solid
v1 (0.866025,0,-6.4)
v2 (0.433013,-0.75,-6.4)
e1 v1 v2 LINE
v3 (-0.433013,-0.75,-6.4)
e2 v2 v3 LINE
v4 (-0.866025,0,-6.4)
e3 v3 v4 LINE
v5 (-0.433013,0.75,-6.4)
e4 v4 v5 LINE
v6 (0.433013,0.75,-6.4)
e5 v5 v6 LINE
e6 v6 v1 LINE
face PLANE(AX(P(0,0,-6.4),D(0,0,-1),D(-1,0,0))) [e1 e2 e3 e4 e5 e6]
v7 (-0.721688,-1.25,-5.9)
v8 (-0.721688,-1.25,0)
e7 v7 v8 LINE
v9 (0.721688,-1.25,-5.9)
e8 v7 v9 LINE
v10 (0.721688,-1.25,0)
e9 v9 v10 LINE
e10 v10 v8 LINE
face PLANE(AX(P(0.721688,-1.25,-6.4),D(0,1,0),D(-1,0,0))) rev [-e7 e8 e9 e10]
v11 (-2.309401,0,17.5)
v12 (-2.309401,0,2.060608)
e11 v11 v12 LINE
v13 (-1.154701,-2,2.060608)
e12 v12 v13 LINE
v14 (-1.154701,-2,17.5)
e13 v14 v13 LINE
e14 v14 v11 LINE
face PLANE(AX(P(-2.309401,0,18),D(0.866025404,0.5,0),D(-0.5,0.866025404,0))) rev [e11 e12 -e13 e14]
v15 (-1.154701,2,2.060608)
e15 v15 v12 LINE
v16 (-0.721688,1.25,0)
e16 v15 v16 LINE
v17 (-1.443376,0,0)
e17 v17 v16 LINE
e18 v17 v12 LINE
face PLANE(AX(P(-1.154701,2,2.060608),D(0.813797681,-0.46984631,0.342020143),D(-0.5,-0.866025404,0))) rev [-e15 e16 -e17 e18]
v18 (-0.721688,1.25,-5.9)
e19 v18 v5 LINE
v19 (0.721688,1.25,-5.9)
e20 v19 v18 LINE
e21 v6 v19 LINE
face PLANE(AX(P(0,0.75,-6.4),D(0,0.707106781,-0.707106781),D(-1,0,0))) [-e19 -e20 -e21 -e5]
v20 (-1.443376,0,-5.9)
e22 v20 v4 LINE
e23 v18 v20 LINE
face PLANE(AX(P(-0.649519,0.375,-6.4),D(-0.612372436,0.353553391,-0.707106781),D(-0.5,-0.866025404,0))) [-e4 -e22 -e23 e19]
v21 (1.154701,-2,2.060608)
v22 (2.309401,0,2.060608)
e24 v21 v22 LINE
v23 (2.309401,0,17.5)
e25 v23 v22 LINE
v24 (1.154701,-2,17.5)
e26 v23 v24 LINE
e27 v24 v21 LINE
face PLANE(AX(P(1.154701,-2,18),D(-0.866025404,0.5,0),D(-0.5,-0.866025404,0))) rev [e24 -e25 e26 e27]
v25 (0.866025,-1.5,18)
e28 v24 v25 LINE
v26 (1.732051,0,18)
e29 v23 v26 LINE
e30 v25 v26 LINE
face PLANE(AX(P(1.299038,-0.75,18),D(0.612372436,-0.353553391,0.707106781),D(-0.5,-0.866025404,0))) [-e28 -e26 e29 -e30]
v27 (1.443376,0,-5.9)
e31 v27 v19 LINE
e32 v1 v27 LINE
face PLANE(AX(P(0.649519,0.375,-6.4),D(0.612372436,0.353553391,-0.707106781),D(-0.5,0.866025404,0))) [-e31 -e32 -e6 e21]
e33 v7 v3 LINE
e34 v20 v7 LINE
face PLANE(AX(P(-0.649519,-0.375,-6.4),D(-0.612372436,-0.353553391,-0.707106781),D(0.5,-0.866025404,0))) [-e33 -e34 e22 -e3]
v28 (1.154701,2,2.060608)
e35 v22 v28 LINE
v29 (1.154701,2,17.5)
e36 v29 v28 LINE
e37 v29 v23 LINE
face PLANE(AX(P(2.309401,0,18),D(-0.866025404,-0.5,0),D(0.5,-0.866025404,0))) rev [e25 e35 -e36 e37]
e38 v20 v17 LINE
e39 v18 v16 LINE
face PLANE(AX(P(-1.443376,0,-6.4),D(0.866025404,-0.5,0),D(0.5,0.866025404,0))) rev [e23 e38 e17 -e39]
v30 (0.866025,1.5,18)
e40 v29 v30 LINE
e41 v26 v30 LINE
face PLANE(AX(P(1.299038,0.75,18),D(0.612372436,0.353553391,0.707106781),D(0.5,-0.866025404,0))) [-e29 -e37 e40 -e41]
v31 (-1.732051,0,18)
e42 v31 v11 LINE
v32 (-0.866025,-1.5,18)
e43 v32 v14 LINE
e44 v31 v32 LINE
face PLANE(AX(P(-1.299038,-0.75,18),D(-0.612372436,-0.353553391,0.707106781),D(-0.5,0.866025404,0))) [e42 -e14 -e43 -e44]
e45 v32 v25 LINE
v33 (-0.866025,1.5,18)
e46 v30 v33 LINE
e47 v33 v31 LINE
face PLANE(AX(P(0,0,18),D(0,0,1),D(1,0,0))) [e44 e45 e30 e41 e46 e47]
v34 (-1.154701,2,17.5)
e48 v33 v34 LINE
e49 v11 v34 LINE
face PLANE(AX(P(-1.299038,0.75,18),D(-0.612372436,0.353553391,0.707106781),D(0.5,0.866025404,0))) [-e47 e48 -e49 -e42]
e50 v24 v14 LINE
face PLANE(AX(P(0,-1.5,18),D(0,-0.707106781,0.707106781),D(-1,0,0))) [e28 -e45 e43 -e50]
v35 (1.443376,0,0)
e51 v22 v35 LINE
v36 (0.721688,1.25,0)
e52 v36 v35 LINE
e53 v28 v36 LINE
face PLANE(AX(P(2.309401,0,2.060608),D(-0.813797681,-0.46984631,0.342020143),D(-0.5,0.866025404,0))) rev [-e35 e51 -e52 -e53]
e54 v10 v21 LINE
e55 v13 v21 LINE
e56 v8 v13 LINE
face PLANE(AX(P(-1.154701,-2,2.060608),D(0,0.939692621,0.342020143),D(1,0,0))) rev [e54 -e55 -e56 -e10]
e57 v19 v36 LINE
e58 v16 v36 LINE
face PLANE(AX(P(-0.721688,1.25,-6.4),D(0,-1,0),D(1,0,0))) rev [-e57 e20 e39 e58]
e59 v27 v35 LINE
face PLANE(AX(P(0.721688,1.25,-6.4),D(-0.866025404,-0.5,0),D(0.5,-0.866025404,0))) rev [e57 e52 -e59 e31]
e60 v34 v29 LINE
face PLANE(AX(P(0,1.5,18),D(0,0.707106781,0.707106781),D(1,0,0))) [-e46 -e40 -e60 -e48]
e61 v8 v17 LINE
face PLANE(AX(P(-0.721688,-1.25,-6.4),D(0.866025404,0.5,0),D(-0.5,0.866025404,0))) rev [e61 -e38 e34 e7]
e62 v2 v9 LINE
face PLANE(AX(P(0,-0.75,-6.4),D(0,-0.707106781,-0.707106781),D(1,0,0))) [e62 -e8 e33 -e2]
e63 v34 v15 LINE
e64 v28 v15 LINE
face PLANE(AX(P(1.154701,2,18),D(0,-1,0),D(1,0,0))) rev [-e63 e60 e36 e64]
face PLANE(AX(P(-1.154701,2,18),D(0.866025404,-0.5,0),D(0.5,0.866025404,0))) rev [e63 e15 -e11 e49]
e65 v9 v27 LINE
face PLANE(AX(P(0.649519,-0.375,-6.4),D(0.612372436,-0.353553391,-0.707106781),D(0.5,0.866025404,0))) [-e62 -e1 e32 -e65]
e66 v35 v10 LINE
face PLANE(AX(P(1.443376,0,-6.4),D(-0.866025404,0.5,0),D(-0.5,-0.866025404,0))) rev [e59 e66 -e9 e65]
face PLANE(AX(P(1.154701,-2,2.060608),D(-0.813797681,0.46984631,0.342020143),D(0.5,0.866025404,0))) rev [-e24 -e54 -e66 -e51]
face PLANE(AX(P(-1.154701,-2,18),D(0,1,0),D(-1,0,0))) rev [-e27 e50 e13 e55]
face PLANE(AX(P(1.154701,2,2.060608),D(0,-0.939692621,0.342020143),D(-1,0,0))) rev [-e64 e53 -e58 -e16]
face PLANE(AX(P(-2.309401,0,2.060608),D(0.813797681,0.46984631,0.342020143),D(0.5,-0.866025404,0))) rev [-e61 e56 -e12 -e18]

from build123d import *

# Parameters (mm, degrees)
EXTRUDE_1_DEPTH  = 18
CHAMFER_1_SIZE   = 0.5
EXTRUDE_2_DEPTH  = 6.4
CHAMFER_3_SIZE   = 0.75
CHAMFER_3_SIZE_2 = 2.060608065
CHAMFER_4_SIZE   = 0.5


with BuildPart() as part:
    # 草图1 → 凸台-拉伸1 (new body)
    with BuildSketch(Plane.XY):
        Polygon((2.309401077, 0), (1.154700538, 2), (-1.154700538, 2), (-2.309401077, 0), (-1.154700538, -2), (1.154700538, -2), align=None)
    extrude(amount=EXTRUDE_1_DEPTH)

    # 倒角1
    chamfer_1_edges = [part.edges().sort_by_distance(p)[0] for p in [
        (0, 2, 18),
        (-1.732050808, 1, 18),
        (-1.732050808, -1, 18),
        (0, -2, 18),
        (1.732050808, -1, 18),
        (1.732050808, 1, 18),
    ]]
    chamfer(chamfer_1_edges, length=CHAMFER_1_SIZE)

    # 草图2 → 凸台-拉伸2 (add)
    with BuildSketch(Plane(origin=(0, 0, 0), x_dir=(-1, 0, 0), z_dir=(0, 0, -1))):
        Polygon((1.443375673, 0), (0.721687836, 1.25), (-0.721687836, 1.25), (-1.443375673, 0), (-0.721687836, -1.25), (0.721687836, -1.25), align=None)
    extrude(amount=EXTRUDE_2_DEPTH)

    # 倒角3
    # the kernel refuses this chamfer: 2.060608065, 0.75 mm, written as the material it takes off along each edge
    with BuildSketch(Plane(origin=(-6.500319125, -2, 0), x_dir=(-1.0524294974817634e-14, 0.9950833631817486, -0.09904090225205059), z_dir=(1, 0, 0))) as chamfer_3_piece_1_section:
        Polygon((CHAMFER_3_SIZE * 0.995083363182, CHAMFER_3_SIZE * 0.0990409022521), (-CHAMFER_3_SIZE_2 * 0.0990409022324, CHAMFER_3_SIZE_2 * 0.995083362984), (0, 0), align=None)
    chamfer_3_piece_1 = extrude(amount=13.000638251, mode=Mode.PRIVATE)
    chamfer_3_piece_1 = split(chamfer_3_piece_1, bisect_by=Plane(origin=(-1.179179606, -0.457601011, 0.71229118), z_dir=(-0.8660254037844392, -0.4999999999999994, 0)), keep=Keep.TOP, mode=Mode.PRIVATE)
    chamfer_3_piece_1 = split(chamfer_3_piece_1, bisect_by=Plane(origin=(-3.459667972, -1.25, 0.71229118), z_dir=(0, -1, 0)), keep=Keep.TOP, mode=Mode.PRIVATE)
    add(chamfer_3_piece_1, mode=Mode.SUBTRACT)
    with BuildSketch(Plane(origin=(-6.500319125, -2, 0), x_dir=(-1.0524294974817634e-14, 0.9950833631817486, -0.09904090225205059), z_dir=(1, 0, 0))) as chamfer_3_piece_2_section:
        Polygon((CHAMFER_3_SIZE * 0.995083363182, CHAMFER_3_SIZE * 0.0990409022521), (-CHAMFER_3_SIZE_2 * 0.0990409022324, CHAMFER_3_SIZE_2 * 0.995083362984), (0, 0), align=None)
    chamfer_3_piece_2 = extrude(amount=13.000638251, mode=Mode.PRIVATE)
    chamfer_3_piece_2 = split(chamfer_3_piece_2, bisect_by=Plane(origin=(-0.338481018, -1.91373368, 0.629088335), z_dir=(0.8660254037844392, 0.4999999999999994, 0)), keep=Keep.TOP, mode=Mode.PRIVATE)
    chamfer_3_piece_2 = split(chamfer_3_piece_2, bisect_by=Plane(origin=(0, -1.25, 0.629088335), z_dir=(0, -1, 0)), keep=Keep.TOP, mode=Mode.PRIVATE)
    chamfer_3_piece_2 = split(chamfer_3_piece_2, bisect_by=Plane(origin=(0.338481018, -1.91373368, 0.629088335), z_dir=(-0.8660254037844385, 0.5000000000000003, 0)), keep=Keep.TOP, mode=Mode.PRIVATE)
    add(chamfer_3_piece_2, mode=Mode.SUBTRACT)
    with BuildSketch(Plane(origin=(-6.500319125, -2, 0), x_dir=(-1.0524294974817634e-14, 0.9950833631817486, -0.09904090225205059), z_dir=(1, 0, 0))) as chamfer_3_piece_3_section:
        Polygon((CHAMFER_3_SIZE * 0.995083363182, CHAMFER_3_SIZE * 0.0990409022521), (-CHAMFER_3_SIZE_2 * 0.0990409022324, CHAMFER_3_SIZE_2 * 0.995083362984), (0, 0), align=None)
    chamfer_3_piece_3 = extrude(amount=13.000638251, mode=Mode.PRIVATE)
    chamfer_3_piece_3 = split(chamfer_3_piece_3, bisect_by=Plane(origin=(3.459667972, -1.25, 0.71229118), z_dir=(0, -1, 0)), keep=Keep.TOP, mode=Mode.PRIVATE)
    chamfer_3_piece_3 = split(chamfer_3_piece_3, bisect_by=Plane(origin=(1.179179606, -0.457601011, 0.71229118), z_dir=(0.8660254037844385, -0.5000000000000003, 0)), keep=Keep.TOP, mode=Mode.PRIVATE)
    add(chamfer_3_piece_3, mode=Mode.SUBTRACT)
    with BuildSketch(Plane(origin=(-4.98221037, 4.629441495, 0), x_dir=(0.8617674713986471, 0.49754168159088125, -0.09904090225205053), z_dir=(0.500000000000007, -0.8660254037844347, 0))) as chamfer_3_piece_4_section:
        Polygon((CHAMFER_3_SIZE * 0.995083363182, CHAMFER_3_SIZE * 0.0990409022521), (-CHAMFER_3_SIZE_2 * 0.0990409022324, CHAMFER_3_SIZE_2 * 0.995083362984), (0, 0), align=None)
    chamfer_3_piece_4 = extrude(amount=13.000638251, mode=Mode.PRIVATE)
    chamfer_3_piece_4 = split(chamfer_3_piece_4, bisect_by=Plane(origin=(-2.812365741, 2.371160352, 0.71229118), z_dir=(-0.8660254037844392, -0.4999999999999994, 0)), keep=Keep.TOP, mode=Mode.PRIVATE)
    chamfer_3_piece_4 = split(chamfer_3_piece_4, bisect_by=Plane(origin=(-0.985883903, 0.792398989, 0.71229118), z_dir=(-0.8660254037844387, 0.5000000000000003, 0)), keep=Keep.TOP, mode=Mode.PRIVATE)
    add(chamfer_3_piece_4, mode=Mode.SUBTRACT)
    with BuildSketch(Plane(origin=(-4.98221037, 4.629441495, 0), x_dir=(0.8617674713986471, 0.49754168159088125, -0.09904090225205053), z_dir=(0.500000000000007, -0.8660254037844347, 0))) as chamfer_3_piece_5_section:
        Polygon((CHAMFER_3_SIZE * 0.995083363182, CHAMFER_3_SIZE * 0.0990409022521), (-CHAMFER_3_SIZE_2 * 0.0990409022324, CHAMFER_3_SIZE_2 * 0.995083362984), (0, 0), align=None)
    chamfer_3_piece_5 = extrude(amount=13.000638251, mode=Mode.PRIVATE)
    chamfer_3_piece_5 = split(chamfer_3_piece_5, bisect_by=Plane(origin=(-1.082531755, -0.625, 0.629088335), z_dir=(-0.8660254037844392, -0.4999999999999994, 0)), keep=Keep.TOP, mode=Mode.PRIVATE)
    chamfer_3_piece_5 = split(chamfer_3_piece_5, bisect_by=Plane(origin=(-1.488101474, -1.25, 0.629088335), z_dir=(0, 1, 0)), keep=Keep.TOP, mode=Mode.PRIVATE)
    chamfer_3_piece_5 = split(chamfer_3_piece_5, bisect_by=Plane(origin=(-1.826582492, -0.66373368, 0.629088335), z_dir=(0.8660254037844387, -0.5000000000000003, 0)), keep=Keep.TOP, mode=Mode.PRIVATE)
    add(chamfer_3_piece_5, mode=Mode.SUBTRACT)
    with BuildSketch(Plane(origin=(-4.98221037, 4.629441495, 0), x_dir=(0.8617674713986471, 0.49754168159088125, -0.09904090225205053), z_dir=(0.500000000000007, -0.8660254037844347, 0))) as chamfer_3_piece_6_section:
        Polygon((CHAMFER_3_SIZE * 0.995083363182, CHAMFER_3_SIZE * 0.0990409022521), (-CHAMFER_3_SIZE_2 * 0.0990409022324, CHAMFER_3_SIZE_2 * 0.995083362984), (0, 0), align=None)
    chamfer_3_piece_6 = extrude(amount=13.000638251, mode=Mode.PRIVATE)
    chamfer_3_piece_6 = split(chamfer_3_piece_6, bisect_by=Plane(origin=(0.647302231, -3.621160352, 0.71229118), z_dir=(-0.8660254037844392, -0.4999999999999994, 0)), keep=Keep.TOP, mode=Mode.PRIVATE)
    chamfer_3_piece_6 = split(chamfer_3_piece_6, bisect_by=Plane(origin=(0.193295703, -1.25, 0.71229118), z_dir=(0, -1, 0)), keep=Keep.TOP, mode=Mode.PRIVATE)
    add(chamfer_3_piece_6, mode=Mode.SUBTRACT)
    with BuildSketch(Plane(origin=(1.518108755, 6.629441495, 0), x_dir=(0.861767471398654, -0.4975416815908692, -0.09904090225205063), z_dir=(-0.4999999999999949, -0.8660254037844416, 0))) as chamfer_3_piece_7_section:
        Polygon((CHAMFER_3_SIZE * 0.995083363182, CHAMFER_3_SIZE * 0.0990409022521), (-CHAMFER_3_SIZE_2 * 0.0990409022324, CHAMFER_3_SIZE_2 * 0.995083362984), (0, 0), align=None)
    chamfer_3_piece_7 = extrude(amount=13.000638251, mode=Mode.PRIVATE)
    chamfer_3_piece_7 = split(chamfer_3_piece_7, bisect_by=Plane(origin=(0.193295703, 1.25, 0.71229118), z_dir=(0, 1, 0)), keep=Keep.TOP, mode=Mode.PRIVATE)
    chamfer_3_piece_7 = split(chamfer_3_piece_7, bisect_by=Plane(origin=(0.647302231, 3.621160352, 0.71229118), z_dir=(-0.8660254037844387, 0.5000000000000003, 0)), keep=Keep.TOP, mode=Mode.PRIVATE)
    add(chamfer_3_piece_7, mode=Mode.SUBTRACT)
    with BuildSketch(Plane(origin=(1.518108755, 6.629441495, 0), x_dir=(0.861767471398654, -0.4975416815908692, -0.09904090225205063), z_dir=(-0.4999999999999949, -0.8660254037844416, 0))) as chamfer_3_piece_8_section:
        Polygon((CHAMFER_3_SIZE * 0.995083363182, CHAMFER_3_SIZE * 0.0990409022521), (-CHAMFER_3_SIZE_2 * 0.0990409022324, CHAMFER_3_SIZE_2 * 0.995083362984), (0, 0), align=None)
    chamfer_3_piece_8 = extrude(amount=13.000638251, mode=Mode.PRIVATE)
    chamfer_3_piece_8 = split(chamfer_3_piece_8, bisect_by=Plane(origin=(-1.826582492, 0.66373368, 0.629088335), z_dir=(0.8660254037844392, 0.4999999999999994, 0)), keep=Keep.TOP, mode=Mode.PRIVATE)
    chamfer_3_piece_8 = split(chamfer_3_piece_8, bisect_by=Plane(origin=(-1.488101474, 1.25, 0.629088335), z_dir=(0, -1, 0)), keep=Keep.TOP, mode=Mode.PRIVATE)
    chamfer_3_piece_8 = split(chamfer_3_piece_8, bisect_by=Plane(origin=(-1.082531755, 0.625, 0.629088335), z_dir=(-0.8660254037844387, 0.5000000000000003, 0)), keep=Keep.TOP, mode=Mode.PRIVATE)
    add(chamfer_3_piece_8, mode=Mode.SUBTRACT)
    with BuildSketch(Plane(origin=(1.518108755, 6.629441495, 0), x_dir=(0.861767471398654, -0.4975416815908692, -0.09904090225205063), z_dir=(-0.4999999999999949, -0.8660254037844416, 0))) as chamfer_3_piece_9_section:
        Polygon((CHAMFER_3_SIZE * 0.995083363182, CHAMFER_3_SIZE * 0.0990409022521), (-CHAMFER_3_SIZE_2 * 0.0990409022324, CHAMFER_3_SIZE_2 * 0.995083362984), (0, 0), align=None)
    chamfer_3_piece_9 = extrude(amount=13.000638251, mode=Mode.PRIVATE)
    chamfer_3_piece_9 = split(chamfer_3_piece_9, bisect_by=Plane(origin=(-0.985883903, -0.792398989, 0.71229118), z_dir=(-0.8660254037844392, -0.4999999999999994, 0)), keep=Keep.TOP, mode=Mode.PRIVATE)
    chamfer_3_piece_9 = split(chamfer_3_piece_9, bisect_by=Plane(origin=(-2.812365741, -2.371160352, 0.71229118), z_dir=(-0.8660254037844387, 0.5000000000000003, 0)), keep=Keep.TOP, mode=Mode.PRIVATE)
    add(chamfer_3_piece_9, mode=Mode.SUBTRACT)
    with BuildSketch(Plane(origin=(6.500319125, 2, 0), x_dir=(3.5399901278932047e-15, -0.9950833631817486, -0.09904090225205059), z_dir=(-1, 0, 0))) as chamfer_3_piece_10_section:
        Polygon((CHAMFER_3_SIZE * 0.995083363182, CHAMFER_3_SIZE * 0.0990409022521), (-CHAMFER_3_SIZE_2 * 0.0990409022324, CHAMFER_3_SIZE_2 * 0.995083362984), (0, 0), align=None)
    chamfer_3_piece_10 = extrude(amount=13.000638251, mode=Mode.PRIVATE)
    chamfer_3_piece_10 = split(chamfer_3_piece_10, bisect_by=Plane(origin=(1.179179606, 0.457601011, 0.71229118), z_dir=(0.8660254037844389, 0.4999999999999995, 0)), keep=Keep.TOP, mode=Mode.PRIVATE)
    chamfer_3_piece_10 = split(chamfer_3_piece_10, bisect_by=Plane(origin=(3.459667972, 1.25, 0.71229118), z_dir=(0, 1, 0)), keep=Keep.TOP, mode=Mode.PRIVATE)
    add(chamfer_3_piece_10, mode=Mode.SUBTRACT)
    with BuildSketch(Plane(origin=(6.500319125, 2, 0), x_dir=(3.5399901278932047e-15, -0.9950833631817486, -0.09904090225205059), z_dir=(-1, 0, 0))) as chamfer_3_piece_11_section:
        Polygon((CHAMFER_3_SIZE * 0.995083363182, CHAMFER_3_SIZE * 0.0990409022521), (-CHAMFER_3_SIZE_2 * 0.0990409022324, CHAMFER_3_SIZE_2 * 0.995083362984), (0, 0), align=None)
    chamfer_3_piece_11 = extrude(amount=13.000638251, mode=Mode.PRIVATE)
    chamfer_3_piece_11 = split(chamfer_3_piece_11, bisect_by=Plane(origin=(0.338481018, 1.91373368, 0.629088335), z_dir=(-0.8660254037844389, -0.4999999999999995, 0)), keep=Keep.TOP, mode=Mode.PRIVATE)
    chamfer_3_piece_11 = split(chamfer_3_piece_11, bisect_by=Plane(origin=(0, 1.25, 0.629088335), z_dir=(0, 1, 0)), keep=Keep.TOP, mode=Mode.PRIVATE)
    chamfer_3_piece_11 = split(chamfer_3_piece_11, bisect_by=Plane(origin=(-0.338481018, 1.91373368, 0.629088335), z_dir=(0.8660254037844387, -0.5000000000000003, 0)), keep=Keep.TOP, mode=Mode.PRIVATE)
    add(chamfer_3_piece_11, mode=Mode.SUBTRACT)
    with BuildSketch(Plane(origin=(6.500319125, 2, 0), x_dir=(3.5399901278932047e-15, -0.9950833631817486, -0.09904090225205059), z_dir=(-1, 0, 0))) as chamfer_3_piece_12_section:
        Polygon((CHAMFER_3_SIZE * 0.995083363182, CHAMFER_3_SIZE * 0.0990409022521), (-CHAMFER_3_SIZE_2 * 0.0990409022324, CHAMFER_3_SIZE_2 * 0.995083362984), (0, 0), align=None)
    chamfer_3_piece_12 = extrude(amount=13.000638251, mode=Mode.PRIVATE)
    chamfer_3_piece_12 = split(chamfer_3_piece_12, bisect_by=Plane(origin=(-3.459667972, 1.25, 0.71229118), z_dir=(0, 1, 0)), keep=Keep.TOP, mode=Mode.PRIVATE)
    chamfer_3_piece_12 = split(chamfer_3_piece_12, bisect_by=Plane(origin=(-1.179179606, 0.457601011, 0.71229118), z_dir=(-0.8660254037844387, 0.5000000000000003, 0)), keep=Keep.TOP, mode=Mode.PRIVATE)
    add(chamfer_3_piece_12, mode=Mode.SUBTRACT)
    with BuildSketch(Plane(origin=(4.98221037, -4.629441495, 0), x_dir=(0.011417729324999642, 0.006592029099322844, 0.9999130865277316), z_dir=(-0.500000000000001, 0.866025403784438, 0))) as chamfer_3_piece_13_section:
        Polygon((CHAMFER_3_SIZE_2 * 0.999913086329, -CHAMFER_3_SIZE_2 * 0.013184058196), (-CHAMFER_3_SIZE * 0.0131840581986, -CHAMFER_3_SIZE * 0.999913086528), (0, 0), align=None)
    chamfer_3_piece_13 = extrude(amount=13.000638251, mode=Mode.PRIVATE)
    chamfer_3_piece_13 = split(chamfer_3_piece_13, bisect_by=Plane(origin=(0.985883903, -0.792398989, 0.71229118), z_dir=(0.8660254037844385, -0.5000000000000003, 0)), keep=Keep.TOP, mode=Mode.PRIVATE)
    chamfer_3_piece_13 = split(chamfer_3_piece_13, bisect_by=Plane(origin=(2.812365741, -2.371160352, 0.71229118), z_dir=(0.8660254037844389, 0.4999999999999995, 0)), keep=Keep.TOP, mode=Mode.PRIVATE)
    add(chamfer_3_piece_13, mode=Mode.SUBTRACT)
    with BuildSketch(Plane(origin=(4.98221037, -4.629441495, 0), x_dir=(0.011417729324999642, 0.006592029099322844, 0.9999130865277316), z_dir=(-0.500000000000001, 0.866025403784438, 0))) as chamfer_3_piece_14_section:
        Polygon((CHAMFER_3_SIZE_2 * 0.999913086329, -CHAMFER_3_SIZE_2 * 0.013184058196), (-CHAMFER_3_SIZE * 0.0131840581986, -CHAMFER_3_SIZE * 0.999913086528), (0, 0), align=None)
    chamfer_3_piece_14 = extrude(amount=13.000638251, mode=Mode.PRIVATE)
    chamfer_3_piece_14 = split(chamfer_3_piece_14, bisect_by=Plane(origin=(1.826582492, 0.66373368, 0.629088335), z_dir=(-0.8660254037844385, 0.5000000000000003, 0)), keep=Keep.TOP, mode=Mode.PRIVATE)
    chamfer_3_piece_14 = split(chamfer_3_piece_14, bisect_by=Plane(origin=(1.082531755, 0.625, 0.629088335), z_dir=(0.8660254037844389, 0.4999999999999995, 0)), keep=Keep.TOP, mode=Mode.PRIVATE)
    chamfer_3_piece_14 = split(chamfer_3_piece_14, bisect_by=Plane(origin=(1.488101474, 1.25, 0.629088335), z_dir=(0, -1, 0)), keep=Keep.TOP, mode=Mode.PRIVATE)
    add(chamfer_3_piece_14, mode=Mode.SUBTRACT)
    with BuildSketch(Plane(origin=(4.98221037, -4.629441495, 0), x_dir=(0.011417729324999642, 0.006592029099322844, 0.9999130865277316), z_dir=(-0.500000000000001, 0.866025403784438, 0))) as chamfer_3_piece_15_section:
        Polygon((CHAMFER_3_SIZE_2 * 0.999913086329, -CHAMFER_3_SIZE_2 * 0.013184058196), (-CHAMFER_3_SIZE * 0.0131840581986, -CHAMFER_3_SIZE * 0.999913086528), (0, 0), align=None)
    chamfer_3_piece_15 = extrude(amount=13.000638251, mode=Mode.PRIVATE)
    chamfer_3_piece_15 = split(chamfer_3_piece_15, bisect_by=Plane(origin=(-0.647302231, 3.621160352, 0.71229118), z_dir=(0.8660254037844389, 0.4999999999999995, 0)), keep=Keep.TOP, mode=Mode.PRIVATE)
    chamfer_3_piece_15 = split(chamfer_3_piece_15, bisect_by=Plane(origin=(-0.193295703, 1.25, 0.71229118), z_dir=(0, 1, 0)), keep=Keep.TOP, mode=Mode.PRIVATE)
    add(chamfer_3_piece_15, mode=Mode.SUBTRACT)
    with BuildSketch(Plane(origin=(-1.518108755, -6.629441495, 0), x_dir=(0.011417729324999607, -0.006592029099322722, 0.9999130865277316), z_dir=(0.4999999999999951, 0.8660254037844415, 0))) as chamfer_3_piece_16_section:
        Polygon((CHAMFER_3_SIZE_2 * 0.999913086329, -CHAMFER_3_SIZE_2 * 0.013184058196), (-CHAMFER_3_SIZE * 0.0131840581986, -CHAMFER_3_SIZE * 0.999913086528), (0, 0), align=None)
    chamfer_3_piece_16 = extrude(amount=13.000638251, mode=Mode.PRIVATE)
    chamfer_3_piece_16 = split(chamfer_3_piece_16, bisect_by=Plane(origin=(-0.193295703, -1.25, 0.71229118), z_dir=(0, -1, 0)), keep=Keep.TOP, mode=Mode.PRIVATE)
    chamfer_3_piece_16 = split(chamfer_3_piece_16, bisect_by=Plane(origin=(-0.647302231, -3.621160352, 0.71229118), z_dir=(0.8660254037844385, -0.5000000000000003, 0)), keep=Keep.TOP, mode=Mode.PRIVATE)
    add(chamfer_3_piece_16, mode=Mode.SUBTRACT)
    with BuildSketch(Plane(origin=(-1.518108755, -6.629441495, 0), x_dir=(0.011417729324999607, -0.006592029099322722, 0.9999130865277316), z_dir=(0.4999999999999951, 0.8660254037844415, 0))) as chamfer_3_piece_17_section:
        Polygon((CHAMFER_3_SIZE_2 * 0.999913086329, -CHAMFER_3_SIZE_2 * 0.013184058196), (-CHAMFER_3_SIZE * 0.0131840581986, -CHAMFER_3_SIZE * 0.999913086528), (0, 0), align=None)
    chamfer_3_piece_17 = extrude(amount=13.000638251, mode=Mode.PRIVATE)
    chamfer_3_piece_17 = split(chamfer_3_piece_17, bisect_by=Plane(origin=(1.488101474, -1.25, 0.629088335), z_dir=(0, 1, 0)), keep=Keep.TOP, mode=Mode.PRIVATE)
    chamfer_3_piece_17 = split(chamfer_3_piece_17, bisect_by=Plane(origin=(1.082531755, -0.625, 0.629088335), z_dir=(0.8660254037844385, -0.5000000000000003, 0)), keep=Keep.TOP, mode=Mode.PRIVATE)
    chamfer_3_piece_17 = split(chamfer_3_piece_17, bisect_by=Plane(origin=(1.826582492, -0.66373368, 0.629088335), z_dir=(-0.8660254037844389, -0.4999999999999995, 0)), keep=Keep.TOP, mode=Mode.PRIVATE)
    add(chamfer_3_piece_17, mode=Mode.SUBTRACT)
    with BuildSketch(Plane(origin=(-1.518108755, -6.629441495, 0), x_dir=(0.011417729324999607, -0.006592029099322722, 0.9999130865277316), z_dir=(0.4999999999999951, 0.8660254037844415, 0))) as chamfer_3_piece_18_section:
        Polygon((CHAMFER_3_SIZE_2 * 0.999913086329, -CHAMFER_3_SIZE_2 * 0.013184058196), (-CHAMFER_3_SIZE * 0.0131840581986, -CHAMFER_3_SIZE * 0.999913086528), (0, 0), align=None)
    chamfer_3_piece_18 = extrude(amount=13.000638251, mode=Mode.PRIVATE)
    chamfer_3_piece_18 = split(chamfer_3_piece_18, bisect_by=Plane(origin=(2.812365741, 2.371160352, 0.71229118), z_dir=(0.8660254037844385, -0.5000000000000003, 0)), keep=Keep.TOP, mode=Mode.PRIVATE)
    chamfer_3_piece_18 = split(chamfer_3_piece_18, bisect_by=Plane(origin=(0.985883903, 0.792398989, 0.71229118), z_dir=(0.8660254037844389, 0.4999999999999995, 0)), keep=Keep.TOP, mode=Mode.PRIVATE)
    add(chamfer_3_piece_18, mode=Mode.SUBTRACT)

    # 倒角4
    chamfer_4_edges = [part.edges().sort_by_distance(p)[0] for p in [
        (-1.082531755, -0.625, -6.4),
        (-1.082531755, 0.625, -6.4),
        (0, 1.25, -6.4),
        (1.082531755, 0.625, -6.4),
        (1.082531755, -0.625, -6.4),
        (0, -1.25, -6.4),
    ]]
    chamfer(chamfer_4_edges, length=CHAMFER_4_SIZE)


solid = part.part
